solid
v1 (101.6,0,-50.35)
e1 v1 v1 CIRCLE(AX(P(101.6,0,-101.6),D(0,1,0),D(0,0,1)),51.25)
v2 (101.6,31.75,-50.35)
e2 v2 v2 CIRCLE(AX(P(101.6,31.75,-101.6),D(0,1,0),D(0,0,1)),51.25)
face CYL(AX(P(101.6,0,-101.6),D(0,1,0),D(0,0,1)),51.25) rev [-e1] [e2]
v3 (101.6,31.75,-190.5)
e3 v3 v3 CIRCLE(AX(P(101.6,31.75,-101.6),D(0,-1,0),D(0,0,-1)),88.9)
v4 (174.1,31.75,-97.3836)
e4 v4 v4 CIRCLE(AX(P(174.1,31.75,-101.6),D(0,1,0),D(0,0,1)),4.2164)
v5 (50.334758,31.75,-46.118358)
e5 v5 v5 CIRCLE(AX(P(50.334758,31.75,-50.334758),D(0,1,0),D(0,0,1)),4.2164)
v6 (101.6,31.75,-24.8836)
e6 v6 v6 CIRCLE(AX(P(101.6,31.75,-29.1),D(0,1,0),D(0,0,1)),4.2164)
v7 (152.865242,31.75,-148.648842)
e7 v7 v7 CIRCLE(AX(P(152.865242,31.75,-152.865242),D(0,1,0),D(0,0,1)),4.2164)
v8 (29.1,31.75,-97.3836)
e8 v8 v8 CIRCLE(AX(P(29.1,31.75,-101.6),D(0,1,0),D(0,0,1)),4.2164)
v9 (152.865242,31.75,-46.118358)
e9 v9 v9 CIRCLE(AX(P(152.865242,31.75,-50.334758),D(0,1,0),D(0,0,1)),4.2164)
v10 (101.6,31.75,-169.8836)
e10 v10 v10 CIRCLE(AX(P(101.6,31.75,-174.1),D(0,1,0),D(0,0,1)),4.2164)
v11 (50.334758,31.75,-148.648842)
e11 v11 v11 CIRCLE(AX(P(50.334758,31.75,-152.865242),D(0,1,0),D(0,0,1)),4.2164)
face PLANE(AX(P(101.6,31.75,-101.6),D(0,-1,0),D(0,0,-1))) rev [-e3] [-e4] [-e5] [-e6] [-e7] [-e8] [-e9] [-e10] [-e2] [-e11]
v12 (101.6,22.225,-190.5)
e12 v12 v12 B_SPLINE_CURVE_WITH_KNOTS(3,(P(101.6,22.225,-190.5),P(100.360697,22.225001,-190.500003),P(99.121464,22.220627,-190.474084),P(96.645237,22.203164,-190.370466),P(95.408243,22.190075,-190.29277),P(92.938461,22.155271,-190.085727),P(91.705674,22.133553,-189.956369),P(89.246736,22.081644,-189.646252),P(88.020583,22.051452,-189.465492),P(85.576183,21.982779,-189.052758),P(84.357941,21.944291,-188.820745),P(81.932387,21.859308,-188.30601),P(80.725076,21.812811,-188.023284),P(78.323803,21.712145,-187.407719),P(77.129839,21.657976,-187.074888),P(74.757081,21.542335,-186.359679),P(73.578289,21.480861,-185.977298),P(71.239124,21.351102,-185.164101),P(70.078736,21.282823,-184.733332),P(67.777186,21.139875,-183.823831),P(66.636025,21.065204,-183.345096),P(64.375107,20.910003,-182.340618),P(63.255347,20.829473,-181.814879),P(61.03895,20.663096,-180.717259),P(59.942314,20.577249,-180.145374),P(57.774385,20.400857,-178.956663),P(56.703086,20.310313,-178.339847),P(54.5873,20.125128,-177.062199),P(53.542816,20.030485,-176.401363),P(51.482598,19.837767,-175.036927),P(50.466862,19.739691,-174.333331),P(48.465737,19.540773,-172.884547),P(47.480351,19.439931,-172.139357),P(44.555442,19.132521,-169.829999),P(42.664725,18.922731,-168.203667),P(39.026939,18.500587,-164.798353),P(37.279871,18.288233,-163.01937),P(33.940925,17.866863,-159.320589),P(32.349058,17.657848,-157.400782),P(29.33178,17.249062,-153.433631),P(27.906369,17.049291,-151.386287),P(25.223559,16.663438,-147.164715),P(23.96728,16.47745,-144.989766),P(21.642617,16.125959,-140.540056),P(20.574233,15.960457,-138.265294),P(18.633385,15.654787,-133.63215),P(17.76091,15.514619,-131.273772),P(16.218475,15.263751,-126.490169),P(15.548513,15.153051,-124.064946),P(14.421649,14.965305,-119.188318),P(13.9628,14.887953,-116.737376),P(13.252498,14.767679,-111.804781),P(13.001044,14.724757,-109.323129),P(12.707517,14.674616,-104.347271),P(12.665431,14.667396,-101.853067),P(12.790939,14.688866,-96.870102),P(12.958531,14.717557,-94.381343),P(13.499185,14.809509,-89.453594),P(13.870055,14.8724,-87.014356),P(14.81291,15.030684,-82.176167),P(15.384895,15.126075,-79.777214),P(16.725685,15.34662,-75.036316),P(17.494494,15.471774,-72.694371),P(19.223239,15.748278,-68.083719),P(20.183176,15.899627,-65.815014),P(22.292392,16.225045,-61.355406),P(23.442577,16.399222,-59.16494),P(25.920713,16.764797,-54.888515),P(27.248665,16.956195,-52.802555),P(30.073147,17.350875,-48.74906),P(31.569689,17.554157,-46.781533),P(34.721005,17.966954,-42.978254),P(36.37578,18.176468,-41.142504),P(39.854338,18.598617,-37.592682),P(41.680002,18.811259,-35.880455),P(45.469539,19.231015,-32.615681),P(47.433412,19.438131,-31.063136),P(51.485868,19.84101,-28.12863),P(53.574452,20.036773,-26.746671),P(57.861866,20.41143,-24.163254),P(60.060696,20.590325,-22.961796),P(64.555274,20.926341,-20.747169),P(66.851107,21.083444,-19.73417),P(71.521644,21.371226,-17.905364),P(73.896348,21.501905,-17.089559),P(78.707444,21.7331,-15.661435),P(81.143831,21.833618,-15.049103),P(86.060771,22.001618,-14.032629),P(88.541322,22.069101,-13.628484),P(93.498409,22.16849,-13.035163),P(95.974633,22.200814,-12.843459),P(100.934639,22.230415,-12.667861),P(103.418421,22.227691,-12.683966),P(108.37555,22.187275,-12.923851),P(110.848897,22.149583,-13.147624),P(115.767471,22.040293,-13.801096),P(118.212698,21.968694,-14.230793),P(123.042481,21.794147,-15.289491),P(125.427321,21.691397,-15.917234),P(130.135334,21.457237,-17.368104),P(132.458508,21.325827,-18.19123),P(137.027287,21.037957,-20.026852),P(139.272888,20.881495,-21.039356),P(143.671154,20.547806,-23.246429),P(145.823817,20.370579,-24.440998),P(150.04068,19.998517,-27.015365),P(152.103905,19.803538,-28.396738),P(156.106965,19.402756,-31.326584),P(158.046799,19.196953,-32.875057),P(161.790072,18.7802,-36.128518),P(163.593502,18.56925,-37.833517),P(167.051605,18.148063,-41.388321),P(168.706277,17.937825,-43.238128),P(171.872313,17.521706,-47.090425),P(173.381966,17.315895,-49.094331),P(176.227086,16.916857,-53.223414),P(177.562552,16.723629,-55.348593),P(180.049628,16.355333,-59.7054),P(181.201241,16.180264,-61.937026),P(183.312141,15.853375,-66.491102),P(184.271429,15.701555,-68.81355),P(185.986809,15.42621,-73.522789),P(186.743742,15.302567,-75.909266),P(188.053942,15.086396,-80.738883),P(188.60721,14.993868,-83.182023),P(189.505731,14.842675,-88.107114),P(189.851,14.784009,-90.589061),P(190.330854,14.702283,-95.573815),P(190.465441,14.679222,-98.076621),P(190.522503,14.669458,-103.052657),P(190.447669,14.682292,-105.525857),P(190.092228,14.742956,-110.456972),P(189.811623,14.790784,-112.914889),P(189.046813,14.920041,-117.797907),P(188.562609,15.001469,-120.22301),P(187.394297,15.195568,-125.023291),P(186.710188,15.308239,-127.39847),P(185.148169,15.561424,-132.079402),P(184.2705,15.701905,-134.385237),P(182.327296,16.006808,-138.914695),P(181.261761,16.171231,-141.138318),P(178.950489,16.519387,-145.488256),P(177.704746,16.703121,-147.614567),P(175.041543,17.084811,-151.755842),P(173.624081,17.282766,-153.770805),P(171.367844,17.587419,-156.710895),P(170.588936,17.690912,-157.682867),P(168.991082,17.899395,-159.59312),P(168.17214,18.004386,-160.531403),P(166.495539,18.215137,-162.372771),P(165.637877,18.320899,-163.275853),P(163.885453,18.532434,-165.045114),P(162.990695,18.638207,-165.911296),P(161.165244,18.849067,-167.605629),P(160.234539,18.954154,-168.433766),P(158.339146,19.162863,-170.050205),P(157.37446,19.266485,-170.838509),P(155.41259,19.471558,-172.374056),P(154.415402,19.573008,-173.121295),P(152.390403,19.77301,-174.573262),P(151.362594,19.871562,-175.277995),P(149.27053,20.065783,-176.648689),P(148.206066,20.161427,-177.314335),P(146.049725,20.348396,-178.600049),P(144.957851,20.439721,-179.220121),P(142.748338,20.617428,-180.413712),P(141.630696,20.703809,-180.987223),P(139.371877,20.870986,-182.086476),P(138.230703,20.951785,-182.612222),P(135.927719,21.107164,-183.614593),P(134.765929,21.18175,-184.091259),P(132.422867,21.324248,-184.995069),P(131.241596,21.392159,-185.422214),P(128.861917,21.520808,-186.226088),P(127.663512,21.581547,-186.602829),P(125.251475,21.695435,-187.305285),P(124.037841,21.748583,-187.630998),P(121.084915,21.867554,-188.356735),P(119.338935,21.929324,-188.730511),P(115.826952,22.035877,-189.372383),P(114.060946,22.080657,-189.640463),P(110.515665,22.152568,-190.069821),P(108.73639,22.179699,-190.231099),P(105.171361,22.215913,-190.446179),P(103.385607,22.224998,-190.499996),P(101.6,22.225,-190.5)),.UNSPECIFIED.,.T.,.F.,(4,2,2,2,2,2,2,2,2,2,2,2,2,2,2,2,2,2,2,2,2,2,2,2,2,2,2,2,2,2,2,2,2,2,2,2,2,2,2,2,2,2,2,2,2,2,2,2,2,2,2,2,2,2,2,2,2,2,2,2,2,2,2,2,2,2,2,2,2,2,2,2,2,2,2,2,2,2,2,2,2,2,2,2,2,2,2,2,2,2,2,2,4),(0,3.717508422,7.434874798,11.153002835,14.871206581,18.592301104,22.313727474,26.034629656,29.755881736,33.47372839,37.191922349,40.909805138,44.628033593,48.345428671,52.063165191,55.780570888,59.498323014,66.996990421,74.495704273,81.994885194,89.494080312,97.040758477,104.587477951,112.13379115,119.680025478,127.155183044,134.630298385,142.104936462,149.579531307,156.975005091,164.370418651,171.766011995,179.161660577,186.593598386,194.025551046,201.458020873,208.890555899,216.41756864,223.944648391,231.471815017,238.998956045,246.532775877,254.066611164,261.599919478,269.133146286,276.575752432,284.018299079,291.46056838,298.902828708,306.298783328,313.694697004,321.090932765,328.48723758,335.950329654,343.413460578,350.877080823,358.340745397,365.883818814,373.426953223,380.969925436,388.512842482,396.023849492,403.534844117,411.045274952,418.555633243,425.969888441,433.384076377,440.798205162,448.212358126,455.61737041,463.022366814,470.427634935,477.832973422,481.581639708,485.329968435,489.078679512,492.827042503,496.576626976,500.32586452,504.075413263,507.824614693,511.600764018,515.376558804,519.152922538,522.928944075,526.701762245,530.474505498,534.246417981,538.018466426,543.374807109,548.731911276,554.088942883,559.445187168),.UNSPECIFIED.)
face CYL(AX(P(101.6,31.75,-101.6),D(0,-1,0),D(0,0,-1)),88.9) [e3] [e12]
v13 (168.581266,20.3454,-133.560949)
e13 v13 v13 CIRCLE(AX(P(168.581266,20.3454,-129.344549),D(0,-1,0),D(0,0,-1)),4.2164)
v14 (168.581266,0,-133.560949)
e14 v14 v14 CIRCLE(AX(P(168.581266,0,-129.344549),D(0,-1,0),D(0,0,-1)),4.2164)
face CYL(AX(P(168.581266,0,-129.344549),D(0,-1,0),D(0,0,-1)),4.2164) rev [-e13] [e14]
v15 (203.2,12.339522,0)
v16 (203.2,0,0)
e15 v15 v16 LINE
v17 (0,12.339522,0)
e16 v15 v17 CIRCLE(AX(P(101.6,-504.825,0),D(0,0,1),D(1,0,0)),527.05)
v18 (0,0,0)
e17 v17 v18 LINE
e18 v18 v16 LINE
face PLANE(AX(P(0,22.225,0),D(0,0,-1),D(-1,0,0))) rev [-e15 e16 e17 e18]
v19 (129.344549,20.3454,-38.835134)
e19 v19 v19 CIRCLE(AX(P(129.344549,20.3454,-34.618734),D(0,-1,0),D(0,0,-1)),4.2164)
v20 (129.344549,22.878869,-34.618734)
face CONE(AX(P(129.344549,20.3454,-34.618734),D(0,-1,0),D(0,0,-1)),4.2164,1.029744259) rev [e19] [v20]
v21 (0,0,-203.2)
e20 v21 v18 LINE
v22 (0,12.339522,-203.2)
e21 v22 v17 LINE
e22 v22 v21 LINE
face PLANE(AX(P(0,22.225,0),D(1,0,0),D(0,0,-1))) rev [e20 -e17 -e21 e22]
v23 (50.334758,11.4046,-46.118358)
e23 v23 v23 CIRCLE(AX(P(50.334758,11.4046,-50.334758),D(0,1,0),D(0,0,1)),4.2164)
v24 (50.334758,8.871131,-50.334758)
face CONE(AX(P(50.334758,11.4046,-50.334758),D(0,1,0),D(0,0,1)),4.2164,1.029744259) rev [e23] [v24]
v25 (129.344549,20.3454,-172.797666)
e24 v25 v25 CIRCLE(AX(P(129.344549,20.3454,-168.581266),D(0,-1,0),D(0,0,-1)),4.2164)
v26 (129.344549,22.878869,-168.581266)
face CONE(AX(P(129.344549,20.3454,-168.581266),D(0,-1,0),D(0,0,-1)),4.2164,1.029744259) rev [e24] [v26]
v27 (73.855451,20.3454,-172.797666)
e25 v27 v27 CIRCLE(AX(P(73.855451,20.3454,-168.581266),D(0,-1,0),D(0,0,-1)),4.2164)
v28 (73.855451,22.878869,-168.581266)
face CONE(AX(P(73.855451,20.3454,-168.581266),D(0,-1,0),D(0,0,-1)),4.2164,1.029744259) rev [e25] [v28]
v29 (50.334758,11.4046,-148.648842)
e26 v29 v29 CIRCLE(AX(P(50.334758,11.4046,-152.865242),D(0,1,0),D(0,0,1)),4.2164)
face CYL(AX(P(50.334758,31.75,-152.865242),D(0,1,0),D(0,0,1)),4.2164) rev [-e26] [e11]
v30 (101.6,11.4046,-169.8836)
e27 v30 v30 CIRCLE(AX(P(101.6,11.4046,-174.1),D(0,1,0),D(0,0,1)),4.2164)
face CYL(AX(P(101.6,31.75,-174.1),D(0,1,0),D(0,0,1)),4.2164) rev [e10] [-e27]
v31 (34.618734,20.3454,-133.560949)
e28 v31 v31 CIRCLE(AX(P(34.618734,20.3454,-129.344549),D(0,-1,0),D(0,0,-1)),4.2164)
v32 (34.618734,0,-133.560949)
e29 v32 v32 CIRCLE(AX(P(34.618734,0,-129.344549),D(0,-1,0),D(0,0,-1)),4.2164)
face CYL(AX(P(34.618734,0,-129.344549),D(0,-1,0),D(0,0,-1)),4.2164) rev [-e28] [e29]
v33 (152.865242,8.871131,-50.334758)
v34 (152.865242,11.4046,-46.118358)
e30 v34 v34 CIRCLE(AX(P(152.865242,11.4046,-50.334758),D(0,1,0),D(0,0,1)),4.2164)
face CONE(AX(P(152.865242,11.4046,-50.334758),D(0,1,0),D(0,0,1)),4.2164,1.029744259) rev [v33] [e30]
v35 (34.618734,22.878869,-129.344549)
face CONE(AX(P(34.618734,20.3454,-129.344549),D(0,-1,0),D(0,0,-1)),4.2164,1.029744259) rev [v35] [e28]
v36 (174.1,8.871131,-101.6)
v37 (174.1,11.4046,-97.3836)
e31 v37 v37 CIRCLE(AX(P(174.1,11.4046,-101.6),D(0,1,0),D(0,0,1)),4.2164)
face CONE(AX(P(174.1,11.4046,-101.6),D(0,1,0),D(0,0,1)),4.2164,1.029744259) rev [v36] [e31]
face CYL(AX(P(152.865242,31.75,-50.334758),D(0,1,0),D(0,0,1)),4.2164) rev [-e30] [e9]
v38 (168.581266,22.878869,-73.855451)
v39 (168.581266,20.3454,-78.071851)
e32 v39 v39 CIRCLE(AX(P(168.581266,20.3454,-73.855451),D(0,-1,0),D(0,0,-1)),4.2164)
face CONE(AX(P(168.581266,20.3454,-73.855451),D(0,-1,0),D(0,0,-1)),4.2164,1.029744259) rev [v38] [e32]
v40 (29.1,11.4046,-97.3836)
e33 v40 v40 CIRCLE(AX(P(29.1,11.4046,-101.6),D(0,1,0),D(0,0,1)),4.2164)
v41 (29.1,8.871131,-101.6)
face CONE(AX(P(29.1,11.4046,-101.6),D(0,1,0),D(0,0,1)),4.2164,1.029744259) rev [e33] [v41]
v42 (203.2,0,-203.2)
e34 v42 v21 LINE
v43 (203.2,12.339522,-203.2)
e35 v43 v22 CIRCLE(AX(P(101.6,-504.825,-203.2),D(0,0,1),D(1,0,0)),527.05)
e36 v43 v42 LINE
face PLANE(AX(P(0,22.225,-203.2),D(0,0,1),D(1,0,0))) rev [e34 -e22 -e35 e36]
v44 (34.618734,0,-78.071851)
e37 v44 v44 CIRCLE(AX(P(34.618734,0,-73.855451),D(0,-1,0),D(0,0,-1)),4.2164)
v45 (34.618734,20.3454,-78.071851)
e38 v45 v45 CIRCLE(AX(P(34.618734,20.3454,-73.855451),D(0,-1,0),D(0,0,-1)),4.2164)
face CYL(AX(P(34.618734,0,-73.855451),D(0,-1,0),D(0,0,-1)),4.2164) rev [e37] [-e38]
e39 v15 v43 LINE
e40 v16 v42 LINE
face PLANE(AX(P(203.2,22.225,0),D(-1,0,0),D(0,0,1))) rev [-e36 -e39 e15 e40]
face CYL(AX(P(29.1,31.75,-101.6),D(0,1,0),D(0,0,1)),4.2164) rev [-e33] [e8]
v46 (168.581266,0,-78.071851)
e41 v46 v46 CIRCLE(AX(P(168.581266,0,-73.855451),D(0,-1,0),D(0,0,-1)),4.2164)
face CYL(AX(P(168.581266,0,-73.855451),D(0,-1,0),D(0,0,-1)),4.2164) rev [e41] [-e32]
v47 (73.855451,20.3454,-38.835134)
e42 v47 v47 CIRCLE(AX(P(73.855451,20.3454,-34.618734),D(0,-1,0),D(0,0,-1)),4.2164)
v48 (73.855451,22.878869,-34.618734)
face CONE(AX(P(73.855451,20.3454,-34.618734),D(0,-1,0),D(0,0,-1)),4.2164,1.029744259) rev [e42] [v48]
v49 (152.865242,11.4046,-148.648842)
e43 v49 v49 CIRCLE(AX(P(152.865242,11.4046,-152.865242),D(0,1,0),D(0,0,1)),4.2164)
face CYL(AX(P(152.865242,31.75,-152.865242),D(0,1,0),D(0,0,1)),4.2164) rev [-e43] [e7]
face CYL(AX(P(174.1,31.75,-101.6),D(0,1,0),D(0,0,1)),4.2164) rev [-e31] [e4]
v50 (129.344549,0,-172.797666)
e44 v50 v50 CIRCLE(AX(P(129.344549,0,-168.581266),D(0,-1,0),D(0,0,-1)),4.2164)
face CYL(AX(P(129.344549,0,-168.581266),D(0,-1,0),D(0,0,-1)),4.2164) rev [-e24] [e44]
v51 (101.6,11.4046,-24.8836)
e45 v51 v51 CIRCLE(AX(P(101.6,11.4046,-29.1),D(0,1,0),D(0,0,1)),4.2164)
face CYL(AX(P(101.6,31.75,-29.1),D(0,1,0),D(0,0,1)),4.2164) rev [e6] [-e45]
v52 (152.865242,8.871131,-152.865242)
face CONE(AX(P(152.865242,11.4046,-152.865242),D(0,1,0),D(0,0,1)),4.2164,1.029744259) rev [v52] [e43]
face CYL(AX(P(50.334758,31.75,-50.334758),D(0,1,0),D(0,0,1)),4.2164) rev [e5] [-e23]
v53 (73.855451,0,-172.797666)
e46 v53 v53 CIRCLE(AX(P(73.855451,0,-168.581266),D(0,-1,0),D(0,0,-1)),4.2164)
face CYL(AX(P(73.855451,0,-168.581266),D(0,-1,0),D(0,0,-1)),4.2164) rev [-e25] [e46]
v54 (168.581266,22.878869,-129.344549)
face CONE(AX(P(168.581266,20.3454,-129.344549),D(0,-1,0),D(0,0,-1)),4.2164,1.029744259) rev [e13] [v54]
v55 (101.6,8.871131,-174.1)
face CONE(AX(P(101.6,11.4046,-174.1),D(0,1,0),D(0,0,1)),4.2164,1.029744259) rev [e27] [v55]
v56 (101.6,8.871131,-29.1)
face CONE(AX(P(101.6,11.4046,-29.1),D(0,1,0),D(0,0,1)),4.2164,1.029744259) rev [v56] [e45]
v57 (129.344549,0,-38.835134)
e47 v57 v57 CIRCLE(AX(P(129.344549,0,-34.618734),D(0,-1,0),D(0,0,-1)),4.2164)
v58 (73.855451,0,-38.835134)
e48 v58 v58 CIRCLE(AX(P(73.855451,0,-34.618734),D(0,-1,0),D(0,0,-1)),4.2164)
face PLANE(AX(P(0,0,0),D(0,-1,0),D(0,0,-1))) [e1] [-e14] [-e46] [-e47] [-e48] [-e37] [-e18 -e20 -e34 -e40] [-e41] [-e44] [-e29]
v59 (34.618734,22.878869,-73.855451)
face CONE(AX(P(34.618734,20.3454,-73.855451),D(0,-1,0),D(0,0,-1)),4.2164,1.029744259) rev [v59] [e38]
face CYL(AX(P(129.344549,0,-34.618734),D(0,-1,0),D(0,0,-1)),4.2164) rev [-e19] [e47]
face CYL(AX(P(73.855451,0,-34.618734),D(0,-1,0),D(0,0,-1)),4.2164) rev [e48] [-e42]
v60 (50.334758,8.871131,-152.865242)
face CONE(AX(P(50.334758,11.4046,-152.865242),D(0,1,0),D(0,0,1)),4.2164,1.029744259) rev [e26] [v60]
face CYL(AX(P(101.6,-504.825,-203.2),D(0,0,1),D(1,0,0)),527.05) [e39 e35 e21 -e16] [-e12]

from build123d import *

# Parameters (mm, degrees)
SKETCH1_W           = 203.2
SKETCH1_H           = 203.2
BOSS_EXTRUDE1_DEPTH = 22.225
CUT_EXTRUDE1_START  = -203.2
CUT_EXTRUDE1_DEPTH  = 203.2
SKETCH3_R           = 88.9
BOSS_EXTRUDE2_DEPTH = 31.75
SKETCH4_R           = 51.25
CUT_EXTRUDE2_DEPTH  = 290.116832062
CIRPATTERN1_COUNT   = 8
CIRPATTERN2_COUNT   = 8


# Read off the part's stored shape, not the designer's step: Cut-Extrude1
with BuildPart() as part:
    # Sketch1 → Boss-Extrude1 (new body)
    with BuildSketch(Plane(origin=(0, 0, 0), x_dir=(1, 0, 0), z_dir=(0, 1, 0))):
        with Locations((101.6, 101.6)):
            Rectangle(SKETCH1_W, SKETCH1_H)
    extrude(amount=BOSS_EXTRUDE1_DEPTH)

    # Cut-Extrude1 outline → Cut-Extrude1 (cut)
    with BuildSketch(Plane.XY.offset(CUT_EXTRUDE1_START)):
        with BuildLine():
            ThreePointArc((0, 12.339521695), (50.560108139, 19.747808997), (101.600002148, 22.225))
            Line((101.600002148, 22.225), (0, 22.225))
            Line((0, 22.225), (0, 12.339521695))
        make_face()
        with BuildLine():
            ThreePointArc((101.600002148, 22.225), (152.639893999, 19.747808789), (203.2, 12.339521695))
            Line((203.2, 12.339521695), (203.2, 22.225))
            Line((203.2, 22.225), (101.600002148, 22.225))
        make_face()
    extrude(amount=CUT_EXTRUDE1_DEPTH, mode=Mode.SUBTRACT)

    # Sketch3 → Boss-Extrude2 (add)
    with BuildSketch(Plane(origin=(0, 0, 0), x_dir=(-1, 0, 0), z_dir=(0, -1, 0))):
        with Locations(Location((-101.6, 101.6, 0), (0, 0, 90))):
            Circle(SKETCH3_R)
    extrude(amount=-BOSS_EXTRUDE2_DEPTH)

    # Sketch4 → Cut-Extrude2 (cut, through all)
    with BuildSketch(Plane(origin=(0, 31.75, 0), x_dir=(1, 0, 0), z_dir=(0, 1, 0))):
        with Locations(Location((101.6, 101.6, 0), (0, 0, 270))):
            Circle(SKETCH4_R)
    extrude(amount=-CUT_EXTRUDE2_DEPTH, mode=Mode.SUBTRACT)

    # Sketch6 → Tapped Hole for 5/16-18 Helicoil1 (revolve, cut)
    with BuildSketch(Plane(origin=(101.6, 31.75, -174.1), x_dir=(0, 0, 1), z_dir=(1, 0, 0))):
        Polygon((0, 0), (0, 22.878868714), (4.2164, 20.3454), (4.2164, 0), align=None)
    tapped_hole_for_5_16_18_helicoil1 = revolve(axis=Axis((101.6, 38.1, -174.1), (0, -1, 0)), mode=Mode.SUBTRACT)

    # CirPattern1: Tapped Hole for 5/16-18 Helicoil1 ×8 about axis
    cirpattern1_axis = Axis((101.6, 0, -101.6), (0, 1, 0))
    for i in range(1, CIRPATTERN1_COUNT):
        add(tapped_hole_for_5_16_18_helicoil1.rotate(cirpattern1_axis, i * 360 / CIRPATTERN1_COUNT), mode=Mode.SUBTRACT)

    # Sketch13 → Tapped Hole for 5/16-18 Helicoil2 (revolve, cut)
    with BuildSketch(Plane(origin=(129.344548846, 0, -34.618733893), x_dir=(0, 0, -1), z_dir=(1, 0, 0))):
        Polygon((0, 0), (0, 22.878868714), (4.2164, 20.3454), (4.2164, 0), align=None)
    tapped_hole_for_5_16_18_helicoil2 = revolve(axis=Axis((129.344548846, -6.35, -34.618733893), (0, 1, 0)), mode=Mode.SUBTRACT)

    # CirPattern2: Tapped Hole for 5/16-18 Helicoil2 ×8 about axis
    cirpattern2_axis = Axis((101.6, 0, -101.6), (0, 1, 0))
    for i in range(1, CIRPATTERN2_COUNT):
        add(tapped_hole_for_5_16_18_helicoil2.rotate(cirpattern2_axis, i * 360 / CIRPATTERN2_COUNT), mode=Mode.SUBTRACT)


solid = part.part
